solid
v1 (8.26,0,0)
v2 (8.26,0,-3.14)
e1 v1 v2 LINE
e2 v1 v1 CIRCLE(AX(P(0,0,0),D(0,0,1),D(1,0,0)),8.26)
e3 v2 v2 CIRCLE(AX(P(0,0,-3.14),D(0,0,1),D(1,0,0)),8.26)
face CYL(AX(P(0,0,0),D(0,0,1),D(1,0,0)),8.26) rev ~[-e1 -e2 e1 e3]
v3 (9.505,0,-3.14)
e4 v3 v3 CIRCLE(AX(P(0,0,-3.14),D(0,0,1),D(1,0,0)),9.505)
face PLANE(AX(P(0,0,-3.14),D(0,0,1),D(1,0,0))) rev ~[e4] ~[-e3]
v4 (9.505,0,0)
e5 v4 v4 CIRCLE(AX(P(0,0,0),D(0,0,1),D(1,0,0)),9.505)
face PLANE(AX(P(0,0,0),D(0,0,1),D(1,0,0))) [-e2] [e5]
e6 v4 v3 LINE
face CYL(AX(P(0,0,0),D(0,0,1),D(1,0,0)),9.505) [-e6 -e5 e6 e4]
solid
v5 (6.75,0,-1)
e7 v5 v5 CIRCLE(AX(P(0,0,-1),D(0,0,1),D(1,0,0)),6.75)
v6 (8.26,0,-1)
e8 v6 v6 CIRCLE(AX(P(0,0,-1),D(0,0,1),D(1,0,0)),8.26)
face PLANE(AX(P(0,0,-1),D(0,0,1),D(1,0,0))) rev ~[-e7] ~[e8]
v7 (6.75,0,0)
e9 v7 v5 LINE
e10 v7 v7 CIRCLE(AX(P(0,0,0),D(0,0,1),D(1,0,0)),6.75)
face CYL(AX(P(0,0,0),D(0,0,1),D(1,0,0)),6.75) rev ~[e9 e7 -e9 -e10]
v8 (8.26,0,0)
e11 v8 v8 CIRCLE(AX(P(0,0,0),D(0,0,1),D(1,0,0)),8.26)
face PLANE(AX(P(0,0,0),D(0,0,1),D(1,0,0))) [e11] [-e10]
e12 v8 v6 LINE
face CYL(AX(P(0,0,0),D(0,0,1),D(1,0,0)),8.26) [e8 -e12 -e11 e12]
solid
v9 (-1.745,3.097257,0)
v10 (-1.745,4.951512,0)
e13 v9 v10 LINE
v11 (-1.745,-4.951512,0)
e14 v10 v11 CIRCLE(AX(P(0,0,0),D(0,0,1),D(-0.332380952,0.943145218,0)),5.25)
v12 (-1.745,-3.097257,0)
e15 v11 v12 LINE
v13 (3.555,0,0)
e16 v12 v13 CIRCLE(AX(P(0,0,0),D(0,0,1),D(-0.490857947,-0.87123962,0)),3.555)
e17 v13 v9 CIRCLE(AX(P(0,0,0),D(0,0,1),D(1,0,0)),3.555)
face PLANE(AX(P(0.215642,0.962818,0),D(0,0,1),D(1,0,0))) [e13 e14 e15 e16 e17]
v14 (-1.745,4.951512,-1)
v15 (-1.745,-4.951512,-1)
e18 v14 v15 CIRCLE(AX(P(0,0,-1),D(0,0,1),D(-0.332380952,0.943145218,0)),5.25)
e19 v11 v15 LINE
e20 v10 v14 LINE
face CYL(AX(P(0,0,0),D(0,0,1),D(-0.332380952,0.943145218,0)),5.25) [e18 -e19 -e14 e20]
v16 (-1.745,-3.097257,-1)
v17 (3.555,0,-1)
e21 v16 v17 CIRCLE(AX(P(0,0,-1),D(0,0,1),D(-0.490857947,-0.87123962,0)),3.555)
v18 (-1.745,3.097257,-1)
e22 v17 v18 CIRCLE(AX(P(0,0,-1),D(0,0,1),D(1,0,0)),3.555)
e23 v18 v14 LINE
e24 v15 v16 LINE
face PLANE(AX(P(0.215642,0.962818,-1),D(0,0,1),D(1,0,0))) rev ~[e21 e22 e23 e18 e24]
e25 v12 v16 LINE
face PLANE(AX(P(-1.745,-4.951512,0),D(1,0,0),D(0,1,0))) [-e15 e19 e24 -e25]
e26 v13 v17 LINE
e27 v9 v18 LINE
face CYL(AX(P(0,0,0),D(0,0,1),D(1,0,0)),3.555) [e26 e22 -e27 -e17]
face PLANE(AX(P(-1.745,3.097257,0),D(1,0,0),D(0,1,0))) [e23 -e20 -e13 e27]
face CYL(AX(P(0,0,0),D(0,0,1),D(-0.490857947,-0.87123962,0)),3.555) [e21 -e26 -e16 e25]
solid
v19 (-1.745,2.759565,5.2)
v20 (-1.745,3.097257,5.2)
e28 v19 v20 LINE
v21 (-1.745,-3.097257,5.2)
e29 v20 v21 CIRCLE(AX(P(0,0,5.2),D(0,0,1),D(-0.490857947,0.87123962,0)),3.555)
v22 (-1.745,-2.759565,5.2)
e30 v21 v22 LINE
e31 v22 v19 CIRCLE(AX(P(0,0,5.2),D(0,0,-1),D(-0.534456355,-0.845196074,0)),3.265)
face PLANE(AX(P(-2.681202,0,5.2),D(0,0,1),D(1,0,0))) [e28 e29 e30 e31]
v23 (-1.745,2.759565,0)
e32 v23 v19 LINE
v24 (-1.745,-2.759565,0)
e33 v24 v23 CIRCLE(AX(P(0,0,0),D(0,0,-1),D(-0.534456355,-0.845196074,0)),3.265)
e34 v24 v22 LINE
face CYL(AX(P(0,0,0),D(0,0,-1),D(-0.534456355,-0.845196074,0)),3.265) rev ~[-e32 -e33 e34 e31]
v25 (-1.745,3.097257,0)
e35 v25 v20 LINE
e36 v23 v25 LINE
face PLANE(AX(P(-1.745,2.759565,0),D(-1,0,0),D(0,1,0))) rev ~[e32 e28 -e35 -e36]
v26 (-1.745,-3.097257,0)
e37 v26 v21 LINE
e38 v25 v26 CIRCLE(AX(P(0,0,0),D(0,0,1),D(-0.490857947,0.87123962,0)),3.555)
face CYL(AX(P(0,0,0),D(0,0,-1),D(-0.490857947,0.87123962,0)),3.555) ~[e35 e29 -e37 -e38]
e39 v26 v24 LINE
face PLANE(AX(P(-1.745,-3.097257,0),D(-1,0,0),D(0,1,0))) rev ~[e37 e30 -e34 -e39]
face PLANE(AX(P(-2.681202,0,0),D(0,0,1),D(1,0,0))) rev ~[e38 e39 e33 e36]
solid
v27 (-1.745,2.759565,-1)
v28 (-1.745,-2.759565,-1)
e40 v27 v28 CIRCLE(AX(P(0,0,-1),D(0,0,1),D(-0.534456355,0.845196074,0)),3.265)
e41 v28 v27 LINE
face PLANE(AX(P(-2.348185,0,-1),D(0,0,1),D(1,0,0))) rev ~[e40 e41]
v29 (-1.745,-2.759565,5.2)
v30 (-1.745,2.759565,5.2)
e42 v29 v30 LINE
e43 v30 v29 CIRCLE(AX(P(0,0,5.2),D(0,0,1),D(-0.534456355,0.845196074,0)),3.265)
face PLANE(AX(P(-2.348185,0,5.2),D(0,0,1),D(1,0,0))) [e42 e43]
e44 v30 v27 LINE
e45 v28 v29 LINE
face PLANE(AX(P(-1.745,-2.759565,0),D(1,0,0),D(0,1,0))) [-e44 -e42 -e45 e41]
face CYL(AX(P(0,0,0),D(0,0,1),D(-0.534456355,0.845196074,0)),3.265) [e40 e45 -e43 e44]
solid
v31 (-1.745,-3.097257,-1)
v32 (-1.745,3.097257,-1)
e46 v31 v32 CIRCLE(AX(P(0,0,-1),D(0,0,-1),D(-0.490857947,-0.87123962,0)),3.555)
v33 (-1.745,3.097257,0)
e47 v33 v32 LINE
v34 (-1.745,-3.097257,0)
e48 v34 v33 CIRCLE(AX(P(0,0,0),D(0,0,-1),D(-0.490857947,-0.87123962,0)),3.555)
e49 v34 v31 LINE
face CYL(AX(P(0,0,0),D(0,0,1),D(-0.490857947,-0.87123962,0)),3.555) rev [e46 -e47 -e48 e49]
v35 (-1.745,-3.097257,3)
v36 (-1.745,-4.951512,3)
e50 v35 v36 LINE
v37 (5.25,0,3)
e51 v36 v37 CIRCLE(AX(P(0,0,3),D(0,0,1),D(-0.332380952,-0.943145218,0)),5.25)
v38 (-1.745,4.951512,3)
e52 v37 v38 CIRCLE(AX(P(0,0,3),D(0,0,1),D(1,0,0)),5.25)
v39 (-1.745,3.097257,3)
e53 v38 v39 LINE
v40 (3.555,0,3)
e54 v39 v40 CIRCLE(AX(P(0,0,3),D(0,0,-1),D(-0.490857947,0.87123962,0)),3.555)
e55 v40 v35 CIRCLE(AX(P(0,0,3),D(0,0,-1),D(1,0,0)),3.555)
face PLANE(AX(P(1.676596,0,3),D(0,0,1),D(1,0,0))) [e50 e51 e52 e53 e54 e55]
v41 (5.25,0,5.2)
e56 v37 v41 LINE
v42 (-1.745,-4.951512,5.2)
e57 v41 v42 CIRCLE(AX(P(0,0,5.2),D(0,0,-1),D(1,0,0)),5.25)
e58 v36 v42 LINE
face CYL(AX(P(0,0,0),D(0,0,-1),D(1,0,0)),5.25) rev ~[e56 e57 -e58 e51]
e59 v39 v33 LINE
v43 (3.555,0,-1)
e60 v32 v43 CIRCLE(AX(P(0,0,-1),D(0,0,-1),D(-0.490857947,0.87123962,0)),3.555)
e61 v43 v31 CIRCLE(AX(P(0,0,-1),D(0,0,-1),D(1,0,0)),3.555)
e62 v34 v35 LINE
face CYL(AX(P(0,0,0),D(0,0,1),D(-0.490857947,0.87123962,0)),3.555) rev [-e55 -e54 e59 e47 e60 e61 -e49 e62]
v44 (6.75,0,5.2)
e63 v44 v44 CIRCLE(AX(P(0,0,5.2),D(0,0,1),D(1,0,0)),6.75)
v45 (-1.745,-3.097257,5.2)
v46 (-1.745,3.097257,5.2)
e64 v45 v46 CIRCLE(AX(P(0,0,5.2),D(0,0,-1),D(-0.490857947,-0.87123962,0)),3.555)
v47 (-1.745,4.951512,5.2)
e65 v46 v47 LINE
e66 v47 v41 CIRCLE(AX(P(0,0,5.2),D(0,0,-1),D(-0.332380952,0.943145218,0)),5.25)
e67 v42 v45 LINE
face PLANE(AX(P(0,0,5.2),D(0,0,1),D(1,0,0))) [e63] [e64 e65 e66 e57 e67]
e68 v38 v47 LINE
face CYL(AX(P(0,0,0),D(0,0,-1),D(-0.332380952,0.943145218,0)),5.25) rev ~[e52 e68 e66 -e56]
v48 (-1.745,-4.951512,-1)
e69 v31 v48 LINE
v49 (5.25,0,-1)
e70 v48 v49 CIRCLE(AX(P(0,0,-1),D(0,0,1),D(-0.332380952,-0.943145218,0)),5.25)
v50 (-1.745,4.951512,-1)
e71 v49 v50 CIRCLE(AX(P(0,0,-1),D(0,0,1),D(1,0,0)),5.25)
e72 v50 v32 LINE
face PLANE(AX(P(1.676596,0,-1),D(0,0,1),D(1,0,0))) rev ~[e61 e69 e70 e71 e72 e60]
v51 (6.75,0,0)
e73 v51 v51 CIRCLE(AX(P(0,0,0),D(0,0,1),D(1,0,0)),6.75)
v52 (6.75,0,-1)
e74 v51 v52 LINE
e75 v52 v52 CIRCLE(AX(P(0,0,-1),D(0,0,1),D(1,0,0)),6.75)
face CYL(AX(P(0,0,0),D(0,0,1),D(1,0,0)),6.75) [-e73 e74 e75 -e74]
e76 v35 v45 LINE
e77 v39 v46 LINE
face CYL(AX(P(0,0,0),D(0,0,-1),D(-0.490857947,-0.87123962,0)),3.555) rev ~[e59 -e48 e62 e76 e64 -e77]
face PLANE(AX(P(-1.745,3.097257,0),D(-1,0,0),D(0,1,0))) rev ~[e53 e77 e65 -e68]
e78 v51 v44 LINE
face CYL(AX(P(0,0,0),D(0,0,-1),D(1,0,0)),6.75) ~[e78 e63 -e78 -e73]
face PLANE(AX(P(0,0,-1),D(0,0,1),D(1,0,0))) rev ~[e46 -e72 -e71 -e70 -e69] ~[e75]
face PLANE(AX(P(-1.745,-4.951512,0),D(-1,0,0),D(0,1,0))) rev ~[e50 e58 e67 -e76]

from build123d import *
from build123d import SkipClean  # not in build123d's __all__

# Parameters (mm, degrees)
F1_DEPTH      = 3
F1_DEPTH_BACK = 1
F0_R          = 6.75
F2_DEPTH      = 5.2
F2_DEPTH_BACK = 1
F0_R_2        = 8.26
F3_DEPTH      = 1
F0_R_3        = 9.505
F4_DEPTH      = 3.14
F5_DEPTH      = 5.2
F6_DEPTH      = 5.2
F6_DEPTH_BACK = 1


with BuildPart() as f1:
    # F0 (on Top) → F1 (new body, two sides)
    with BuildSketch(Plane.XY) as f1_sk:
        with BuildLine():
            ThreePointArc((-1.745, 3.0972568508), (1.7936763922, 3.0693240298), (3.555, 0))
            ThreePointArc((3.555, 0), (1.7936763922, -3.0693240298), (-1.745, -3.0972568508))
            Line((-1.745, -3.0972568508), (-1.745, -4.9515123952))
            ThreePointArc((-1.745, -4.9515123952), (3.0332532041, -4.2850758453), (5.25, 0))
            ThreePointArc((5.25, 0), (3.0332532041, 4.2850758453), (-1.745, 4.9515123952))
            Line((-1.745, 4.9515123952), (-1.745, 3.0972568508))
        make_face()
    extrude(amount=F1_DEPTH)
    extrude(f1_sk.sketch, amount=-F1_DEPTH_BACK)

    # F0 (on Top) → F2 (join, two sides)
    with BuildSketch(Plane.XY) as f2_sk:
        Circle(F0_R)
        with BuildLine():
            ThreePointArc((-1.745, -4.9515123952), (-5.25, 0), (-1.745, 4.9515123952))
            ThreePointArc((-1.745, 4.9515123952), (3.0332532041, 4.2850758453), (5.25, 0))
            ThreePointArc((5.25, 0), (3.0332532041, -4.2850758453), (-1.745, -4.9515123952))
        make_face(mode=Mode.SUBTRACT)
        with BuildLine():
            ThreePointArc((-1.745, -3.0972568508), (-3.555, 0), (-1.745, 3.0972568508))
            Line((-1.745, 3.0972568508), (-1.745, 4.9515123952))
            ThreePointArc((-1.745, 4.9515123952), (-5.25, 0), (-1.745, -4.9515123952))
            Line((-1.745, -4.9515123952), (-1.745, -3.0972568508))
        make_face()
    with SkipClean():  # cleaning this boolean's faces spoils the solid; the shape is the same uncleaned
        extrude(amount=F2_DEPTH)
        extrude(f2_sk.sketch, amount=-F2_DEPTH_BACK)


with BuildPart() as f3:
    # F0 (on Top) → F3 (new body)
    with BuildSketch(Plane.XY):
        Circle(F0_R_2)
        Circle(F0_R, mode=Mode.SUBTRACT)
    extrude(amount=-F3_DEPTH)


with BuildPart() as f3b:
    # F0 (on Top) → F3, piece 2 (new body)
    with BuildSketch(Plane.XY):
        with BuildLine():
            Line((-1.745, 0), (2.48, 0))
            ThreePointArc((2.48, 0), (0.9546727188, 2.288886192), (-1.745, 1.7622074225))
            Line((-1.745, 1.7622074225), (-1.745, 0))
        make_face()
        with BuildLine():
            Line((3.265, 0), (3.555, 0))
            ThreePointArc((3.555, 0), (1.7936763922, 3.0693240298), (-1.745, 3.0972568508))
            Line((-1.745, 3.0972568508), (-1.745, 2.7595651831))
            ThreePointArc((-1.745, 2.7595651831), (1.5752460125, 2.8598645073), (3.265, 0))
        make_face()
        with BuildLine():
            ThreePointArc((-1.745, -1.7622074225), (0.9546727188, -2.288886192), (2.48, 0))
            Line((2.48, 0), (-1.745, 0))
            Line((-1.745, 0), (-1.745, -1.7622074225))
        make_face()
        with BuildLine():
            ThreePointArc((-1.745, -2.7595651831), (1.5752460125, -2.8598645073), (3.265, 0))
            Line((3.265, 0), (2.48, 0))
            ThreePointArc((2.48, 0), (0.9546727188, -2.288886192), (-1.745, -1.7622074225))
            Line((-1.745, -1.7622074225), (-1.745, -2.7595651831))
        make_face()
        with BuildLine():
            Line((-1.745, 0), (-1.745, 1.7622074225))
            ThreePointArc((-1.745, 1.7622074225), (-2.48, 0), (-1.745, -1.7622074225))
            Line((-1.745, -1.7622074225), (-1.745, 0))
        make_face()
        with BuildLine():
            Line((-1.745, 1.7622074225), (-1.745, 2.7595651831))
            ThreePointArc((-1.745, 2.7595651831), (-3.265, 0), (-1.745, -2.7595651831))
            Line((-1.745, -2.7595651831), (-1.745, -1.7622074225))
            ThreePointArc((-1.745, -1.7622074225), (-2.48, 0), (-1.745, 1.7622074225))
        make_face()
        with BuildLine():
            ThreePointArc((-1.745, -3.0972568508), (1.7936763922, -3.0693240298), (3.555, 0))
            Line((3.555, 0), (3.265, 0))
            ThreePointArc((3.265, 0), (1.5752460125, -2.8598645073), (-1.745, -2.7595651831))
            Line((-1.745, -2.7595651831), (-1.745, -3.0972568508))
        make_face()
        with BuildLine():
            Line((2.48, 0), (3.265, 0))
            ThreePointArc((3.265, 0), (1.5752460125, 2.8598645073), (-1.745, 2.7595651831))
            Line((-1.745, 2.7595651831), (-1.745, 1.7622074225))
            ThreePointArc((-1.745, 1.7622074225), (0.9546727188, 2.288886192), (2.48, 0))
        make_face()
        with BuildLine():
            ThreePointArc((-1.745, -3.0972568508), (-3.555, 0), (-1.745, 3.0972568508))
            Line((-1.745, 3.0972568508), (-1.745, 4.9515123952))
            ThreePointArc((-1.745, 4.9515123952), (-5.25, 0), (-1.745, -4.9515123952))
            Line((-1.745, -4.9515123952), (-1.745, -3.0972568508))
        make_face()
        with BuildLine():
            Line((-1.745, 2.7595651831), (-1.745, 3.0972568508))
            ThreePointArc((-1.745, 3.0972568508), (-3.555, 0), (-1.745, -3.0972568508))
            Line((-1.745, -3.0972568508), (-1.745, -2.7595651831))
            ThreePointArc((-1.745, -2.7595651831), (-3.265, 0), (-1.745, 2.7595651831))
        make_face()
    extrude(amount=-F3_DEPTH)


with BuildPart() as f4:
    # F0 (on Top) → F4 (new body)
    with BuildSketch(Plane.XY):
        Circle(F0_R_3)
        Circle(F0_R_2, mode=Mode.SUBTRACT)
    extrude(amount=-F4_DEPTH)


with BuildPart() as f5:
    # F0 (on Top) → F5 (new body)
    with BuildSketch(Plane.XY):
        with BuildLine():
            Line((-1.745, 2.7595651831), (-1.745, 3.0972568508))
            ThreePointArc((-1.745, 3.0972568508), (-3.555, 0), (-1.745, -3.0972568508))
            Line((-1.745, -3.0972568508), (-1.745, -2.7595651831))
            ThreePointArc((-1.745, -2.7595651831), (-3.265, 0), (-1.745, 2.7595651831))
        make_face()
    extrude(amount=F5_DEPTH)


with BuildPart() as f6:
    # F0 (on Top) → F6 (new body, two sides)
    with BuildSketch(Plane.XY) as f6_sk:
        with BuildLine():
            Line((-1.745, 1.7622074225), (-1.745, 2.7595651831))
            ThreePointArc((-1.745, 2.7595651831), (-3.265, 0), (-1.745, -2.7595651831))
            Line((-1.745, -2.7595651831), (-1.745, -1.7622074225))
            ThreePointArc((-1.745, -1.7622074225), (-2.48, 0), (-1.745, 1.7622074225))
        make_face()
        with BuildLine():
            Line((-1.745, 0), (-1.745, 1.7622074225))
            ThreePointArc((-1.745, 1.7622074225), (-2.48, 0), (-1.745, -1.7622074225))
            Line((-1.745, -1.7622074225), (-1.745, 0))
        make_face()
    extrude(amount=F6_DEPTH)
    extrude(f6_sk.sketch, amount=-F6_DEPTH_BACK)


solid = Compound([f1.part, f3.part, f3b.part, f4.part, f5.part, f6.part])
